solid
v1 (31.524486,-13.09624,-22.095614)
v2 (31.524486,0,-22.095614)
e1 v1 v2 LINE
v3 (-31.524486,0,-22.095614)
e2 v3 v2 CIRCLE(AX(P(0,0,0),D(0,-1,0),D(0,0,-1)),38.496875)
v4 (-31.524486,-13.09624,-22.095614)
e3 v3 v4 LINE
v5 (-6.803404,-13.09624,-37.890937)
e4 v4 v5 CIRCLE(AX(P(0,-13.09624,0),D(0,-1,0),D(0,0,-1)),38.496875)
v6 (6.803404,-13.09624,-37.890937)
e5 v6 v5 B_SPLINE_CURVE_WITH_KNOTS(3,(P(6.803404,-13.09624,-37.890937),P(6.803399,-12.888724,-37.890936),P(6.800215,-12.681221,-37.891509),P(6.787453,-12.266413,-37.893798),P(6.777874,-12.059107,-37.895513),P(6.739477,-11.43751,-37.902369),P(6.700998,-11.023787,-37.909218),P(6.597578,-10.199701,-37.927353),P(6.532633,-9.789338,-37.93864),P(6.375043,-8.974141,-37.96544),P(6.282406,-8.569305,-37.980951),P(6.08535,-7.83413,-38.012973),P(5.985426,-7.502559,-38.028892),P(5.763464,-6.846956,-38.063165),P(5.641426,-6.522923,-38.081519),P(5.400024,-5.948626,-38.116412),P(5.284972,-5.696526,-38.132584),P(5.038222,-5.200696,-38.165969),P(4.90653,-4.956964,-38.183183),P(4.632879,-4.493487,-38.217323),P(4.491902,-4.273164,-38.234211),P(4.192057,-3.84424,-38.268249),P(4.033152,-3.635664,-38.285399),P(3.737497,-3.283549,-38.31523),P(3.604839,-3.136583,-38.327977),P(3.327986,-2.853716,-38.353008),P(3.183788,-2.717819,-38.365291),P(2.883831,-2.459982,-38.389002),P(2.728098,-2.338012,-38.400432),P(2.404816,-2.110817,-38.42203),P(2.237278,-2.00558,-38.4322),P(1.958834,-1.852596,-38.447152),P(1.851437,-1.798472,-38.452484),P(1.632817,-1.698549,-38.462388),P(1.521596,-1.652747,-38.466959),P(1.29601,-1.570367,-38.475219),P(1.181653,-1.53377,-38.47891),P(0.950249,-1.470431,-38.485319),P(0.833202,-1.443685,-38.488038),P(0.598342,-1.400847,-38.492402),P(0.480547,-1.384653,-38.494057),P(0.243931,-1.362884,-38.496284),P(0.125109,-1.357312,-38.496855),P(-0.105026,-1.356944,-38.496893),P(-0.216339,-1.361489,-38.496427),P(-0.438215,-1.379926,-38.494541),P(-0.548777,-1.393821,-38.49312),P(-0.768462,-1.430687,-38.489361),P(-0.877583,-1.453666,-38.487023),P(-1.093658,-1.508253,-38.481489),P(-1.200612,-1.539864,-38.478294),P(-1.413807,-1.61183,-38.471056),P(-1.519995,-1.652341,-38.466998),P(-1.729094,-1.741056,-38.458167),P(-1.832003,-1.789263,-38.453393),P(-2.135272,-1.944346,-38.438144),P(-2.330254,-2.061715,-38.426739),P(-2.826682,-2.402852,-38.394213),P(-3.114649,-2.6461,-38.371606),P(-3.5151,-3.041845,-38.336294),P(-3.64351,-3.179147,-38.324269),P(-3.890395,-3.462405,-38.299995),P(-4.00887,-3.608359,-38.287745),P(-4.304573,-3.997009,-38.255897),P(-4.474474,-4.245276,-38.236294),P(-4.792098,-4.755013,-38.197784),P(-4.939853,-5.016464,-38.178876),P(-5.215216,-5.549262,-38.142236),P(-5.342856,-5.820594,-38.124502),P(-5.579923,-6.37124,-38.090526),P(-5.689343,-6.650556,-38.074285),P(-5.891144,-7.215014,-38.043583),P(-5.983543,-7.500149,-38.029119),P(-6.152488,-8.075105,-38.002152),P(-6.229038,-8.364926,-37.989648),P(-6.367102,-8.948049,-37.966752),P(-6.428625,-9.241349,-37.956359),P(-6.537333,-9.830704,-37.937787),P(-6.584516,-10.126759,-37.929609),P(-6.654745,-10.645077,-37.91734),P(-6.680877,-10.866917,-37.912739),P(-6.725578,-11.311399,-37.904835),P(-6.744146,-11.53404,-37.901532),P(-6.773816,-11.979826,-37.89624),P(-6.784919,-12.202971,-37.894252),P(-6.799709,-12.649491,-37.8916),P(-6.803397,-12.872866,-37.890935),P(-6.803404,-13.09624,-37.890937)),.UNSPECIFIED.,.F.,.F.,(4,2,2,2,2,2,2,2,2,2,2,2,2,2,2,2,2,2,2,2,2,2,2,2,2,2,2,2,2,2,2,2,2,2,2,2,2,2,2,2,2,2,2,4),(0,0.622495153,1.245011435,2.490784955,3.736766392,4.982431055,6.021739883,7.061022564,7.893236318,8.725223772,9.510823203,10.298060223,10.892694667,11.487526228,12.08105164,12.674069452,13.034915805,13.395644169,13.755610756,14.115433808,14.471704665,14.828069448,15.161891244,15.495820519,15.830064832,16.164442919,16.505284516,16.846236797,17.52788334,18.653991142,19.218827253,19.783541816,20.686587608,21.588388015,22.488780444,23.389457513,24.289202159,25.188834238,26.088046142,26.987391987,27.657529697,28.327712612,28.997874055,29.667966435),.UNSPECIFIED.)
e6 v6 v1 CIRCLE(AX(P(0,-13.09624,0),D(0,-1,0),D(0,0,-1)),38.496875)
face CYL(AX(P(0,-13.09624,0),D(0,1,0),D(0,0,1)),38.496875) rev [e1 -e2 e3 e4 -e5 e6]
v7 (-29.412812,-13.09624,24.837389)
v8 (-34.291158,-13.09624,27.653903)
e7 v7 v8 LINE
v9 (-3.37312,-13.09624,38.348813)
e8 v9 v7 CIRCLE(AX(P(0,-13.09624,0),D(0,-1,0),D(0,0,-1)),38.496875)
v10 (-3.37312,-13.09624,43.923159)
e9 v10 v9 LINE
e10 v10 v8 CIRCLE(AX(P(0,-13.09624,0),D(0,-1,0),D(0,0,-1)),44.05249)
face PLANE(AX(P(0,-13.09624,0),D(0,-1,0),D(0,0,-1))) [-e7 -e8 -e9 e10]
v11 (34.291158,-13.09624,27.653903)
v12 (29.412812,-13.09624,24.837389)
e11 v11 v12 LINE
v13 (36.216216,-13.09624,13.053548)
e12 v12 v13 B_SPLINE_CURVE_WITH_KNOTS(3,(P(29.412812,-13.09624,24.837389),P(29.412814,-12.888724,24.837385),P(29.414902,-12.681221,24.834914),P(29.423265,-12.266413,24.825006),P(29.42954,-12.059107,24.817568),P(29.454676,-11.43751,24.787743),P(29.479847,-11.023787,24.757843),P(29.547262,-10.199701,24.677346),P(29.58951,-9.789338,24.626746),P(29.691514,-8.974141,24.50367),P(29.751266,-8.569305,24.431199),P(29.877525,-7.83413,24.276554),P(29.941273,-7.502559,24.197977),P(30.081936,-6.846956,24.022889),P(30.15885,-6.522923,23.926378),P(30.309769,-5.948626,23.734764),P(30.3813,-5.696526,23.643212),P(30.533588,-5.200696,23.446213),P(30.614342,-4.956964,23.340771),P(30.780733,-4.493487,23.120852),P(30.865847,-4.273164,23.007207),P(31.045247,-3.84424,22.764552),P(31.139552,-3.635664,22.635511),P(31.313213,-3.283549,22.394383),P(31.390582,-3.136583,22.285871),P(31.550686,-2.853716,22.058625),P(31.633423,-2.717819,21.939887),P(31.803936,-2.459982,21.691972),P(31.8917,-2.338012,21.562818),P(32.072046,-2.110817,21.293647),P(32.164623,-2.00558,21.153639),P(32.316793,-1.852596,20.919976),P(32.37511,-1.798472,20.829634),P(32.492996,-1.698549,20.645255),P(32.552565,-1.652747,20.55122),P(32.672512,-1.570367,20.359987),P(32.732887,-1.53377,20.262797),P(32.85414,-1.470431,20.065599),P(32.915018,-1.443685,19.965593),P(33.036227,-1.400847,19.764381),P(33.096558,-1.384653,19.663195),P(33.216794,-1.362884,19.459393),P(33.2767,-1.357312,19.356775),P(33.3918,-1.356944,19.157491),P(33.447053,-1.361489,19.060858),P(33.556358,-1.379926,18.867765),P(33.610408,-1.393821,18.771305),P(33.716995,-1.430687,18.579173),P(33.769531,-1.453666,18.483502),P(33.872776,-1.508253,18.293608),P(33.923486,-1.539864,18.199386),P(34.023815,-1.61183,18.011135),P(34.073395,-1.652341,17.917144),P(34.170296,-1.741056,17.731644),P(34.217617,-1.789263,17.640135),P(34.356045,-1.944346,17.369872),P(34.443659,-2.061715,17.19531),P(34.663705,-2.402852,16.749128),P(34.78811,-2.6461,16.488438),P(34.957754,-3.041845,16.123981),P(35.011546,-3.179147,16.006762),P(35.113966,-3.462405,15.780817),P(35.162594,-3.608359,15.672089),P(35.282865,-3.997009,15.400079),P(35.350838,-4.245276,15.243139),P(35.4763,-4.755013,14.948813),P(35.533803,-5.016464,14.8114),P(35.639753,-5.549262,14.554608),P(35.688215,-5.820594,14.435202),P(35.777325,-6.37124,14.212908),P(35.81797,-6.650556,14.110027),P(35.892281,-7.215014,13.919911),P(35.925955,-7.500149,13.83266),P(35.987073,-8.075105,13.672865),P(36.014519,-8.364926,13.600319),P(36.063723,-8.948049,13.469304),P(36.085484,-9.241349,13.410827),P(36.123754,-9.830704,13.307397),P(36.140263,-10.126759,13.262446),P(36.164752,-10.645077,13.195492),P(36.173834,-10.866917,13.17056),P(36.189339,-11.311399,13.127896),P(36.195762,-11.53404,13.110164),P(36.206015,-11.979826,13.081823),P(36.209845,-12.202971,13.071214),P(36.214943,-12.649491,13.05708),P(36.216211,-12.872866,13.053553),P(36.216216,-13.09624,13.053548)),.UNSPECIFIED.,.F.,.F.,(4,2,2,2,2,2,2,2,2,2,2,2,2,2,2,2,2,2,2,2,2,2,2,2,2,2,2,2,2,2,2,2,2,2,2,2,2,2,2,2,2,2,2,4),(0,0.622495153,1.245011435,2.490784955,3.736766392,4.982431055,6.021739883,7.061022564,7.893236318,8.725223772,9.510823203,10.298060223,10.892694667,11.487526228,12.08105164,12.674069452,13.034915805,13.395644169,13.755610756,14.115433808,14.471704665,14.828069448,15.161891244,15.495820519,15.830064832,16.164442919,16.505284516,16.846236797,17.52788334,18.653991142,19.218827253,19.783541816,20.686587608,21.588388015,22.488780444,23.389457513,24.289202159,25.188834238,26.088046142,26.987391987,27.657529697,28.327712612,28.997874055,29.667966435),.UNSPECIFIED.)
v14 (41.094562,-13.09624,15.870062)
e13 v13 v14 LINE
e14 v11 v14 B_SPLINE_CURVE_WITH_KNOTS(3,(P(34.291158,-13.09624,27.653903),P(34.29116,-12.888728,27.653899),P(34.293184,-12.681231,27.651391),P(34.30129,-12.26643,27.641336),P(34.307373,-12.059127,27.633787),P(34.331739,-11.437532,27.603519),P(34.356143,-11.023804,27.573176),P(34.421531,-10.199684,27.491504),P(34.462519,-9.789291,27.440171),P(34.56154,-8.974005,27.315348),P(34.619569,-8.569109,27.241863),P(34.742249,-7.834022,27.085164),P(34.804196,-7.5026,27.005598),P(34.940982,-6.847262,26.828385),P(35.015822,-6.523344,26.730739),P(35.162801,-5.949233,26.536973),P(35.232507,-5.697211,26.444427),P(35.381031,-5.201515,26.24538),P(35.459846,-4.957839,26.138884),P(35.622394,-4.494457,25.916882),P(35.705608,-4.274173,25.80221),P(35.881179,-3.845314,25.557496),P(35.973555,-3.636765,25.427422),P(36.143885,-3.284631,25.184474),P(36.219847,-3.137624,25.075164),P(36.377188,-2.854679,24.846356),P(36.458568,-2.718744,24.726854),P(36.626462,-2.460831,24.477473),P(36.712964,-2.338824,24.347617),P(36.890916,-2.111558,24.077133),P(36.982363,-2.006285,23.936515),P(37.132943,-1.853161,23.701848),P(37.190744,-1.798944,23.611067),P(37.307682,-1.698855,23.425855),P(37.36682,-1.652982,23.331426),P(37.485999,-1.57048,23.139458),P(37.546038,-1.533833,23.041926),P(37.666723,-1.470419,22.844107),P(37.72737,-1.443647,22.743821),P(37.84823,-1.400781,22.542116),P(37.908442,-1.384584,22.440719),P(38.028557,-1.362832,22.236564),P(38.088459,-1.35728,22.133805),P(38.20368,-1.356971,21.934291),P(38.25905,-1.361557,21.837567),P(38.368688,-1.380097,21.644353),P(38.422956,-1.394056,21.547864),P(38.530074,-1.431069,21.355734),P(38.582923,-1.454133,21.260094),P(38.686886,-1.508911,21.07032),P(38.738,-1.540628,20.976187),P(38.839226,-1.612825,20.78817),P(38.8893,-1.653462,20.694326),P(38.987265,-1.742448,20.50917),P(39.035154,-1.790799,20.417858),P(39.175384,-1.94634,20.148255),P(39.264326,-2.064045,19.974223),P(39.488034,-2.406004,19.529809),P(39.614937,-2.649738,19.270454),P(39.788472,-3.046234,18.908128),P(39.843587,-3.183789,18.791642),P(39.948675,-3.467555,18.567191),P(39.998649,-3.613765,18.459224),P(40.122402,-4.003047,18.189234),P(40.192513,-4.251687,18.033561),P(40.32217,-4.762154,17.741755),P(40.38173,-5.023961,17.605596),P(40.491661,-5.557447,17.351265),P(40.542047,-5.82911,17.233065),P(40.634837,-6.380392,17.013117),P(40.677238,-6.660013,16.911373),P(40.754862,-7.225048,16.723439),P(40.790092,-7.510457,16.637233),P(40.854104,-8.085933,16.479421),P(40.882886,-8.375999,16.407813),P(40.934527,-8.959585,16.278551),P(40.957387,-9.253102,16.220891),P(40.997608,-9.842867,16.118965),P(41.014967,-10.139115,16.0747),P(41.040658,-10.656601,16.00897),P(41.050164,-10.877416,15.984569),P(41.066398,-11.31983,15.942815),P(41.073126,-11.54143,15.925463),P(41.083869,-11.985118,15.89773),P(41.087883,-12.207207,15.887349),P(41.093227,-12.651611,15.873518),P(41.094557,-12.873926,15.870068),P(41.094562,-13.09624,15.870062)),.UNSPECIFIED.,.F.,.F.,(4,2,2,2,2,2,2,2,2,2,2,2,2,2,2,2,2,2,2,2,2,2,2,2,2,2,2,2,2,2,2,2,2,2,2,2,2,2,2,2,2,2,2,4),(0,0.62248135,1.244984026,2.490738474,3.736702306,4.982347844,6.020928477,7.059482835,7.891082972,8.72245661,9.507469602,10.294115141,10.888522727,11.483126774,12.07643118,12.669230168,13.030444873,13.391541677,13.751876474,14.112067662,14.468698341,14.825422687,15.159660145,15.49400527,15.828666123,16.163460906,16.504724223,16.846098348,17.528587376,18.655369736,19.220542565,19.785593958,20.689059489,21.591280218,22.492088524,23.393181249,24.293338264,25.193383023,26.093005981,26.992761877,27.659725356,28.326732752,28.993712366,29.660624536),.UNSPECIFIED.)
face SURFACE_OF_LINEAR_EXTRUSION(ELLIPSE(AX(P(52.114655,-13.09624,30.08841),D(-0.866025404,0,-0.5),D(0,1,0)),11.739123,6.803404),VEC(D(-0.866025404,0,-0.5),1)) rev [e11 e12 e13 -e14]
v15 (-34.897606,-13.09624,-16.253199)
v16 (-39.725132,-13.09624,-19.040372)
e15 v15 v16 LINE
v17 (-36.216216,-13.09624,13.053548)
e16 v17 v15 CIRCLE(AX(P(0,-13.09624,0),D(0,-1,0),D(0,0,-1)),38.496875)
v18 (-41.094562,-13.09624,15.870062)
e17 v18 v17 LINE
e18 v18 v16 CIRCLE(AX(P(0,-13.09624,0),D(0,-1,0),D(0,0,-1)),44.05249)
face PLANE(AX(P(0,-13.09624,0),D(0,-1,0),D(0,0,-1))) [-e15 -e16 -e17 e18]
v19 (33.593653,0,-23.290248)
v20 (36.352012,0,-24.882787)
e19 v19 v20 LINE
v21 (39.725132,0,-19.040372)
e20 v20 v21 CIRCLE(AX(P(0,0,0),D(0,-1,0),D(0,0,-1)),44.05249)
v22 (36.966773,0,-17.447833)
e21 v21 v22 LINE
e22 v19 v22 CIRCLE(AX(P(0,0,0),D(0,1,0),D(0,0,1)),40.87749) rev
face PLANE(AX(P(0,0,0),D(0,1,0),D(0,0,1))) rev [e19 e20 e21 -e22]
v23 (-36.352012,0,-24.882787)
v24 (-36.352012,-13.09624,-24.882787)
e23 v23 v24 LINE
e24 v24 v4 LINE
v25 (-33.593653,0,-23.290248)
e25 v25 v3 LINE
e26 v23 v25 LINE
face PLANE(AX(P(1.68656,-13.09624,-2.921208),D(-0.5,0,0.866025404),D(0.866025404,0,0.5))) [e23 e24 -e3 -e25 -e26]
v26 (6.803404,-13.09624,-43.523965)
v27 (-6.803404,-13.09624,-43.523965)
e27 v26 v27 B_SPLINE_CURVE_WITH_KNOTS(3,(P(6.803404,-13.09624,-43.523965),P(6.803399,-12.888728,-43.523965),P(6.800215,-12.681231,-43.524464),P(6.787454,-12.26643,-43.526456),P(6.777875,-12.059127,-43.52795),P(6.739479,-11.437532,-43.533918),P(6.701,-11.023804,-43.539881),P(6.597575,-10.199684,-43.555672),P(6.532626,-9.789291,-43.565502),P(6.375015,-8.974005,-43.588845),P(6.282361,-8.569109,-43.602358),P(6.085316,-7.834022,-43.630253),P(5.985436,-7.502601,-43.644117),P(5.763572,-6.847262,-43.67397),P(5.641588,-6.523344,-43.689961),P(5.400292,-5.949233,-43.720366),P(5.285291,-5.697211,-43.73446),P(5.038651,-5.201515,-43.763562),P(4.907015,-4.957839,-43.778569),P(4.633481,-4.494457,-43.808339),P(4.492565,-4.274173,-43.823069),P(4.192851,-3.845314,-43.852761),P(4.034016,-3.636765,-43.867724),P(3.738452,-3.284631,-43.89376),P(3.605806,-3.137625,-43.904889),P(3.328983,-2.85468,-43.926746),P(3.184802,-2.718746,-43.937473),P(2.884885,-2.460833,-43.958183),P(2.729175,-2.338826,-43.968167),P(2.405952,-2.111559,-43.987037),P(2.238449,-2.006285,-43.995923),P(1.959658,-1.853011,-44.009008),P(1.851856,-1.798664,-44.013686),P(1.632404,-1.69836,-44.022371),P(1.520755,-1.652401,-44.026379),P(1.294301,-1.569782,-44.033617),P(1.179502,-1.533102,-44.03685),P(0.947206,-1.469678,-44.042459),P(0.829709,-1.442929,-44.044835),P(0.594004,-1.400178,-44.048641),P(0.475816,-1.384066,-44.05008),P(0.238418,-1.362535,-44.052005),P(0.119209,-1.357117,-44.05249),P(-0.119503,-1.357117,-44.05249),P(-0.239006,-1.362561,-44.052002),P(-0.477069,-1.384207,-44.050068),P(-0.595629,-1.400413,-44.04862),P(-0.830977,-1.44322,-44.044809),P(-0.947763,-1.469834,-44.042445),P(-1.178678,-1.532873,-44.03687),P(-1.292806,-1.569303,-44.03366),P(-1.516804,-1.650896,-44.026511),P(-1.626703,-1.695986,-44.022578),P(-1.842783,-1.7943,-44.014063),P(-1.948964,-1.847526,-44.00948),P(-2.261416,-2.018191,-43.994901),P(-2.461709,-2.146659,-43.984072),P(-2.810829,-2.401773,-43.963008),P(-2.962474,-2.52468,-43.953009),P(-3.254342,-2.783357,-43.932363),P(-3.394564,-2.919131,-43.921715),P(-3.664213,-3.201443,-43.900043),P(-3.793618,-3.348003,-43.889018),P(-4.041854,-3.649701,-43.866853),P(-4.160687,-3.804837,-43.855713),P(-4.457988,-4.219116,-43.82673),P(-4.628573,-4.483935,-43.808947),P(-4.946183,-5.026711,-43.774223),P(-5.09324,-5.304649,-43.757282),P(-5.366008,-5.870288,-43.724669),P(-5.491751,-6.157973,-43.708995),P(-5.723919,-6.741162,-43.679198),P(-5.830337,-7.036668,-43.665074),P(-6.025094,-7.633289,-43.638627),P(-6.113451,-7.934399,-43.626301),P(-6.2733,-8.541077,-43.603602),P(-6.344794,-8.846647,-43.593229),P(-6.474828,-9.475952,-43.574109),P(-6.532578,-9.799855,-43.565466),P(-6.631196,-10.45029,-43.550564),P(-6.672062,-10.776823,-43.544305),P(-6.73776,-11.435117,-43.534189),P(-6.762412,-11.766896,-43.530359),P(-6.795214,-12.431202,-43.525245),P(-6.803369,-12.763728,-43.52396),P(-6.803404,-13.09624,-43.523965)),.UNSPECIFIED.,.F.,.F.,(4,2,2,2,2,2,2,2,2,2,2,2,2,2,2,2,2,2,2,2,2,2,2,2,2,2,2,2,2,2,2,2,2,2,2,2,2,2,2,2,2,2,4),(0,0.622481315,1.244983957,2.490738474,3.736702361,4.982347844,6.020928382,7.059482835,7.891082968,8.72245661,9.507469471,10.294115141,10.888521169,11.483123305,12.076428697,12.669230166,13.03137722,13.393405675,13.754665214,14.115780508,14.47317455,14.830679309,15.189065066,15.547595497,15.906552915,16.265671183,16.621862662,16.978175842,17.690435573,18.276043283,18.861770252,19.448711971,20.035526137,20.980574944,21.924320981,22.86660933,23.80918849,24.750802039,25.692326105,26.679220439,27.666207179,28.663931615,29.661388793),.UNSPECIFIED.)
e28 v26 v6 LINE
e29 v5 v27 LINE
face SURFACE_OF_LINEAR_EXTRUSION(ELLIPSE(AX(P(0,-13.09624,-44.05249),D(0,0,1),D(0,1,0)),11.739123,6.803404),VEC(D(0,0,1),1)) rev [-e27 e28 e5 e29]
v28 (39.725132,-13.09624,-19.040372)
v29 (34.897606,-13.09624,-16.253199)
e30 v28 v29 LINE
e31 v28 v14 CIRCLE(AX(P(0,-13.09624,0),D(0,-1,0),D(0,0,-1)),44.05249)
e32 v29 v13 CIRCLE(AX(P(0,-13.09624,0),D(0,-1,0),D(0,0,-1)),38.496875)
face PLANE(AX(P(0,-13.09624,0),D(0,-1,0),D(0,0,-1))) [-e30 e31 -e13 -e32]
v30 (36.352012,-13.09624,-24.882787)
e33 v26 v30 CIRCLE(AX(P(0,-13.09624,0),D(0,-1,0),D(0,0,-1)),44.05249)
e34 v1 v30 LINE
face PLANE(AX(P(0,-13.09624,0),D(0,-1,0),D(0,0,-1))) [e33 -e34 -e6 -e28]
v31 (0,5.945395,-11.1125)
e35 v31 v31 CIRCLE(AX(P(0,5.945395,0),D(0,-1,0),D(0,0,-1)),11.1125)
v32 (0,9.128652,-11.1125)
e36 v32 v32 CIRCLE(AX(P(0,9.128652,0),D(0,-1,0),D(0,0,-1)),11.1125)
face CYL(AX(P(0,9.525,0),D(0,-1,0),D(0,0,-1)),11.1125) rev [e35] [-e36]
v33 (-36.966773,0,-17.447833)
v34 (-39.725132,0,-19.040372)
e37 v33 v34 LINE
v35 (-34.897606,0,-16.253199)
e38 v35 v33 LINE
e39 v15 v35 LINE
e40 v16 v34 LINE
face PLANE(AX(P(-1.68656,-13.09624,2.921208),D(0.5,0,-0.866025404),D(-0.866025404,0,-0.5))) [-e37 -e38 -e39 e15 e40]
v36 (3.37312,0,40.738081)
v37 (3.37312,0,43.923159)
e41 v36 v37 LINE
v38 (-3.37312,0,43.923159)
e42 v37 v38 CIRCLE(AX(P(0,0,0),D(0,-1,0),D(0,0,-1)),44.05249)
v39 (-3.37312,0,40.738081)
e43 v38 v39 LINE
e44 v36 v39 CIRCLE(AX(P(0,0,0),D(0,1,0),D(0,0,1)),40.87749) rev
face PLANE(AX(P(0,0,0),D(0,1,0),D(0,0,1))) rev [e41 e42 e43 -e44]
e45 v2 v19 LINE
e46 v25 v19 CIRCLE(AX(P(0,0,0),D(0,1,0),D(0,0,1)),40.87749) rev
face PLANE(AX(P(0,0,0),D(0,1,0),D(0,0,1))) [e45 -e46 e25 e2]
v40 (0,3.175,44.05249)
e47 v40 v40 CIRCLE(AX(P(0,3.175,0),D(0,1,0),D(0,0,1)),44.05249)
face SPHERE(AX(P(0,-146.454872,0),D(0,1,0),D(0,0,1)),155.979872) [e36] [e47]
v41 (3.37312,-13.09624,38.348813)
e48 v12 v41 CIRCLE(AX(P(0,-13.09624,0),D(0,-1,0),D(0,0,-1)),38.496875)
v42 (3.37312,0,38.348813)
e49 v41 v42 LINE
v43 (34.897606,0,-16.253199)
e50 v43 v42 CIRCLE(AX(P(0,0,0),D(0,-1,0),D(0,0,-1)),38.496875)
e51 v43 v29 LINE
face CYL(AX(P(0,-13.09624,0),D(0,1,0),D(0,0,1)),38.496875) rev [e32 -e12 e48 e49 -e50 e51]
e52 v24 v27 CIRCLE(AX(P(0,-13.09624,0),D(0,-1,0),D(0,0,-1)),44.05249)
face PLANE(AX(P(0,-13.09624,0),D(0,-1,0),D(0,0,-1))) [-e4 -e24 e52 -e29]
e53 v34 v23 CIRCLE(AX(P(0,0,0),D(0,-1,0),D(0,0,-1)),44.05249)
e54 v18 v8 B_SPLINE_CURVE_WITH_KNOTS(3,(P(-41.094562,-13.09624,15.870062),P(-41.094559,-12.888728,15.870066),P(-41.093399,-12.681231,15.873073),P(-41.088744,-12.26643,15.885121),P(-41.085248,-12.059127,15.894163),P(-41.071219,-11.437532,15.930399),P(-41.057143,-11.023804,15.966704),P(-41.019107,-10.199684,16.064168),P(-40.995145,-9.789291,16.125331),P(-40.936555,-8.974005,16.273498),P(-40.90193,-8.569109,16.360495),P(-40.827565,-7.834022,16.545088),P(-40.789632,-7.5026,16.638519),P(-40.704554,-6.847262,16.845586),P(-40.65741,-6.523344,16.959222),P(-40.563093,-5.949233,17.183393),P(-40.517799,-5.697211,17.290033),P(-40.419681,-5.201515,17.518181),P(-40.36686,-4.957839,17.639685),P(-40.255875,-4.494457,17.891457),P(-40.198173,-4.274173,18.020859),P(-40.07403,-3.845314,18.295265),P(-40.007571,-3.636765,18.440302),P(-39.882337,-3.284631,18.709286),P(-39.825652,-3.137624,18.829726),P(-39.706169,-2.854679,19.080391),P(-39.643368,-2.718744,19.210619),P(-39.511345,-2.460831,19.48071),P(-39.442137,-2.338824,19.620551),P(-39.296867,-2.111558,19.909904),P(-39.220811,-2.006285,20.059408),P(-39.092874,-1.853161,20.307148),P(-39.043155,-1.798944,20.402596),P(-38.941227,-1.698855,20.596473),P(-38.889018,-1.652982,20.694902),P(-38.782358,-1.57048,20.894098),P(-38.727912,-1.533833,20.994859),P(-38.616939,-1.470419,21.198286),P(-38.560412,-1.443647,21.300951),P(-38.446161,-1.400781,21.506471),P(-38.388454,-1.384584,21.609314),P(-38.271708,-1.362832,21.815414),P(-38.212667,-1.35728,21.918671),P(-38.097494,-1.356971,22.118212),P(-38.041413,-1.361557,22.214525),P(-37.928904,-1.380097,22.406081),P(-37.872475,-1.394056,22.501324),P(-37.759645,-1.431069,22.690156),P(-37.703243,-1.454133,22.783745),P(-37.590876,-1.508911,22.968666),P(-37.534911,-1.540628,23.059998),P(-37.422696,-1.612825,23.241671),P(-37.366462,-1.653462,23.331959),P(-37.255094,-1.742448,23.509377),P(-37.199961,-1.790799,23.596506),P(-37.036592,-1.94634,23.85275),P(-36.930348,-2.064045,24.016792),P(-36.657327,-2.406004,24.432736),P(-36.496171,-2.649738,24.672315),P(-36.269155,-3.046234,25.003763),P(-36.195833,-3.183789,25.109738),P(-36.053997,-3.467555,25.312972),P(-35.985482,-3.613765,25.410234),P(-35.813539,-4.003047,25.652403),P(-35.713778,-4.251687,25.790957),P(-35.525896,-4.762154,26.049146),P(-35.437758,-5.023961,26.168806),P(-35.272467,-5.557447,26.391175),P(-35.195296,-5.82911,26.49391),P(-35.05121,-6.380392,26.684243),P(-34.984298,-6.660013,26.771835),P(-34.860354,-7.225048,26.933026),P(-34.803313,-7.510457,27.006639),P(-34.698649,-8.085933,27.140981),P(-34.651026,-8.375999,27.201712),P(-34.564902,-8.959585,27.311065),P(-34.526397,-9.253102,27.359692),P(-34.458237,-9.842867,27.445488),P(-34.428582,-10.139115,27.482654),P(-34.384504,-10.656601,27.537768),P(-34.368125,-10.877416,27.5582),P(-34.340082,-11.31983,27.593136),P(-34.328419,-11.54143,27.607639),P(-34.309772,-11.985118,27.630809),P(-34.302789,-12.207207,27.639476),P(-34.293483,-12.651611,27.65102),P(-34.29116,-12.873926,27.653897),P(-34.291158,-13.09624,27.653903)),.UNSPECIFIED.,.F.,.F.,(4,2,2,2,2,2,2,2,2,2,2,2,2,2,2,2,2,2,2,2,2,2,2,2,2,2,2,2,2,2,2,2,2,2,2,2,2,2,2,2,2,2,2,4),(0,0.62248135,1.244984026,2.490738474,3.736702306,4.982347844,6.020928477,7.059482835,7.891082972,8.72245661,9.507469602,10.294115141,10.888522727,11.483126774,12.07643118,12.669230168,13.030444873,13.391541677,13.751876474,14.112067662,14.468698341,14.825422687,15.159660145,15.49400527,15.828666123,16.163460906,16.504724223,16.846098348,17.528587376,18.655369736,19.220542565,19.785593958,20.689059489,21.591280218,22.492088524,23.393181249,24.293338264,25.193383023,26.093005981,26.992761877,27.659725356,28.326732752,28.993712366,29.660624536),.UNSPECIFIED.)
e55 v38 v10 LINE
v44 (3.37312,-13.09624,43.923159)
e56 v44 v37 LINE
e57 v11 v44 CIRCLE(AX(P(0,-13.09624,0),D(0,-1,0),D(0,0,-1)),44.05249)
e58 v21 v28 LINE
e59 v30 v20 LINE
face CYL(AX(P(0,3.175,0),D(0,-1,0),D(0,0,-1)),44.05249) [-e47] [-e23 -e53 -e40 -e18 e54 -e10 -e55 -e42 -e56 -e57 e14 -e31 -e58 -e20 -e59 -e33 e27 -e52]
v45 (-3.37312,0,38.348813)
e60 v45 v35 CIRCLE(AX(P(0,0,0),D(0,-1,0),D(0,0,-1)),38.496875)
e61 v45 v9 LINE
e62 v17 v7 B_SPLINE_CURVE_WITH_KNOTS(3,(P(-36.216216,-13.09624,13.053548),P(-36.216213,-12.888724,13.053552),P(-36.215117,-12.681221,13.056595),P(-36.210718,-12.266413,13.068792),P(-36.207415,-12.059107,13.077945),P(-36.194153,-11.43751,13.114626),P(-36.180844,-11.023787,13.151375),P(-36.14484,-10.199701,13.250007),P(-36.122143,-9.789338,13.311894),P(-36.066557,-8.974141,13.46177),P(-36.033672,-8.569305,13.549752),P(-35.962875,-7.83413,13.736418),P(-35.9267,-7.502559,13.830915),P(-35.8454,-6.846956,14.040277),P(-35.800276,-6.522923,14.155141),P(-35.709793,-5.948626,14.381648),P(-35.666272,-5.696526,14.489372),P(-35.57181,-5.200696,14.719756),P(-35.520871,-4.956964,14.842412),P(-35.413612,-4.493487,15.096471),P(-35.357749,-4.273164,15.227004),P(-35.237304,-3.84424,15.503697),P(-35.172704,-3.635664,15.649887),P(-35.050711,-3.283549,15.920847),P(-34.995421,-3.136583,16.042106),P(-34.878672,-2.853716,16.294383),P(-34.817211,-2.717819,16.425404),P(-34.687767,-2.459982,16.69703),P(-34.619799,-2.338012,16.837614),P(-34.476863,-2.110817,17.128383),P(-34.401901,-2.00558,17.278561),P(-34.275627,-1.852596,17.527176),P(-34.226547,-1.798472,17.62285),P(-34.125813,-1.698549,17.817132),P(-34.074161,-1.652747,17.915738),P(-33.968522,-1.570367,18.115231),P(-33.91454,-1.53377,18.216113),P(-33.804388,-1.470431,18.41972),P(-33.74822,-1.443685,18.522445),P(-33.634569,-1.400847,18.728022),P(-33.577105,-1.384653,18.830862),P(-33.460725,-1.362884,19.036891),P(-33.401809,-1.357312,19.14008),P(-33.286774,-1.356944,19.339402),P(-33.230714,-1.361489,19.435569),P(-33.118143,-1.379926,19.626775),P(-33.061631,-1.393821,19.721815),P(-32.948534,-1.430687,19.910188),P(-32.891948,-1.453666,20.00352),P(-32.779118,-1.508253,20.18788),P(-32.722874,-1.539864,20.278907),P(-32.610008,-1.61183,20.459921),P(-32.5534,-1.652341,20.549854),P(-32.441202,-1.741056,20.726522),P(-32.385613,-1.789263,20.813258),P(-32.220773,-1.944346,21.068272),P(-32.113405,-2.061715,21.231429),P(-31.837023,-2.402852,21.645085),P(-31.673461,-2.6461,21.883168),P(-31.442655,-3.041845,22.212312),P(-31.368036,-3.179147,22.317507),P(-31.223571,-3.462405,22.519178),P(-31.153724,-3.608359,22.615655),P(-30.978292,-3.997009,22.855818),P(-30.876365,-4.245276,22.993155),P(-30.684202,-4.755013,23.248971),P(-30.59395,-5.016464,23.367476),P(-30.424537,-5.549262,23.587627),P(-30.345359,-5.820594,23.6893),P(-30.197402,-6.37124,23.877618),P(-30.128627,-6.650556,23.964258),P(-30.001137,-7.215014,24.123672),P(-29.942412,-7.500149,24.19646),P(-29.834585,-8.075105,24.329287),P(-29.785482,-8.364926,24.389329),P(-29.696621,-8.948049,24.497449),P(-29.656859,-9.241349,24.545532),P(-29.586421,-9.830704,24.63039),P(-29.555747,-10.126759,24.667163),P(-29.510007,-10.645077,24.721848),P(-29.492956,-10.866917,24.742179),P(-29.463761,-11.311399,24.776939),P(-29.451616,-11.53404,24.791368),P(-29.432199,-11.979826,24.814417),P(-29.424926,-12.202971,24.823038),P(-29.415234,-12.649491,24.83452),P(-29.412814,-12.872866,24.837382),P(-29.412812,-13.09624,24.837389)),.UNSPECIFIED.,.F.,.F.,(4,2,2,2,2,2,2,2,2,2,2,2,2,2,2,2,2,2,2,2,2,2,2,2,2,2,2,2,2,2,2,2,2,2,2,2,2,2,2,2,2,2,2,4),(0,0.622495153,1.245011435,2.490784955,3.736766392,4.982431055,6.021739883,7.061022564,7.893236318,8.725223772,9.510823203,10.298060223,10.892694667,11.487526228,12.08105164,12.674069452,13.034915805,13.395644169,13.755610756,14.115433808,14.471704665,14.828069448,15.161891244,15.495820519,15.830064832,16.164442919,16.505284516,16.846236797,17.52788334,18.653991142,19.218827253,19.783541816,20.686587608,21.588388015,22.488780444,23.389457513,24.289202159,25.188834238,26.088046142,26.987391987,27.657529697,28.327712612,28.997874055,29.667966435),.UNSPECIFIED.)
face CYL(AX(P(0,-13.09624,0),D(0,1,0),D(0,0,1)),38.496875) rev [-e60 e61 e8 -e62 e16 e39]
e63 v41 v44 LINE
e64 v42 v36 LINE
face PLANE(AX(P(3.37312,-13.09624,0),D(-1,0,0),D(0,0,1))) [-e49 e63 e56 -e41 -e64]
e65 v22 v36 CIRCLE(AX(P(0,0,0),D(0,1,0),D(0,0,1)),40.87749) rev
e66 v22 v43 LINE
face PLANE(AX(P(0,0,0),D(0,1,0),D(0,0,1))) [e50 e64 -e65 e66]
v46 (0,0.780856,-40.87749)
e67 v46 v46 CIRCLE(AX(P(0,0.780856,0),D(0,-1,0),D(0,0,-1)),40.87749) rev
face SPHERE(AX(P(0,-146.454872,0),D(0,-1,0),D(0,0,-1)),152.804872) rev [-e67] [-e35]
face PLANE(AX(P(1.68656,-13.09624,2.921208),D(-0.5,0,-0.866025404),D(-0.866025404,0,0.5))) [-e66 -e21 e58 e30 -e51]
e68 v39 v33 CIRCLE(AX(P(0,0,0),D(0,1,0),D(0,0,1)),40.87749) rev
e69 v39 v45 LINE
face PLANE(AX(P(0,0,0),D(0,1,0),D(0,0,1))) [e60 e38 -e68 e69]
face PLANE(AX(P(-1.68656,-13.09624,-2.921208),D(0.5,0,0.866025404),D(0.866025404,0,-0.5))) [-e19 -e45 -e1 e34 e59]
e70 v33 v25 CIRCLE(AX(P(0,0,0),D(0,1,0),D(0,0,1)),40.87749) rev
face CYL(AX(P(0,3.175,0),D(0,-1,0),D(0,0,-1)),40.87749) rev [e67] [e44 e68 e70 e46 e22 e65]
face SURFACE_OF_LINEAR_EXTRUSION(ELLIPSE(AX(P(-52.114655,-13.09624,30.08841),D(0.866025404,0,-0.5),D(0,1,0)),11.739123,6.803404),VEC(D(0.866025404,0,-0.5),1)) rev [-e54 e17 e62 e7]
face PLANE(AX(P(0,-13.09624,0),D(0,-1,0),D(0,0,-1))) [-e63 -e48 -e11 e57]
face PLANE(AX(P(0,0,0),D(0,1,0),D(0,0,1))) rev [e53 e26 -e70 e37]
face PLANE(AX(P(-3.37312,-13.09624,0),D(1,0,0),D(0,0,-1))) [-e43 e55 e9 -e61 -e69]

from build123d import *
from build123d.topology import SkipClean

# Parameters (mm, degrees)
SKETCH2_R           = 44.05249
BOSS_EXTRUDE1_DEPTH = 3.175
SKETCH4_R           = 44.45
SKETCH4_R_2         = 38.496875
BOSS_EXTRUDE2_DEPTH = 13.09624
SKETCH5_W           = 6.74624
SKETCH5_H           = 50.081304553
CUT_EXTRUDE1_DEPTH  = 65.211498208
CIRPATTERN1_COUNT   = 3
DOME1_FACE_RADIUS   = 44.05249
DOME1_HEIGHT        = 6.35
SKETCH11_R          = 11.1125
CUT_EXTRUDE4_DEPTH  = 65.211498208
SKETCH12_R          = 44.45
SKETCH12_R_2        = 44.05249
CUT_EXTRUDE5_DEPTH  = 67.674963897
SKETCH13_RX         = 11.739123023
SKETCH13_RY         = 6.803403928
CUT_EXTRUDE6_DEPTH  = 64.661253935
CIRPATTERN2_COUNT   = 3


# Read off the part's stored shape, not the designer's step: Shell2
with BuildPart() as part:
    # Sketch2 → Boss-Extrude1 (new body)
    with BuildSketch(Plane(origin=(0, 0, 0), x_dir=(1, 0, 0), z_dir=(0, 1, 0))):
        with Locations(Location((0, 0, 0), (0, 0, 270))):
            Circle(SKETCH2_R)
    extrude(amount=BOSS_EXTRUDE1_DEPTH)

    # Sketch4 → Boss-Extrude2 (add)
    with BuildSketch(Plane.XZ):
        with Locations(Location((0, 0, 0), (0, 0, 270))):
            Circle(SKETCH4_R)
        with Locations(Location((0, 0, 0), (0, 0, 270))):
            Circle(SKETCH4_R_2, mode=Mode.SUBTRACT)
    extrude(amount=BOSS_EXTRUDE2_DEPTH)

    # Sketch5 → Cut-Extrude1 (cut, through all)
    with BuildSketch(Plane.XZ):
        with Locations((0, 25.040652277)):
            Rectangle(SKETCH5_W, SKETCH5_H)
    cut_extrude1 = extrude(amount=CUT_EXTRUDE1_DEPTH, mode=Mode.SUBTRACT)

    # CirPattern1: Cut-Extrude1 ×3 about axis
    cirpattern1_axis = Axis((0, 0, 0), (0, 1, 0))
    for i in range(1, CIRPATTERN1_COUNT):
        add(cut_extrude1.rotate(cirpattern1_axis, i * 360 / CIRPATTERN1_COUNT), mode=Mode.SUBTRACT)

    # Dome1: a dome of height H over a round flat face of radius A is a cap of a sphere of radius (A * A + H * H) / (2 * H)
    dome1_r = (DOME1_FACE_RADIUS * DOME1_FACE_RADIUS + DOME1_HEIGHT * DOME1_HEIGHT) / (2 * DOME1_HEIGHT)
    dome1_base = Plane((0, 3.175, 0), z_dir=(0, 1, 0))
    with Locations(dome1_base.offset(DOME1_HEIGHT - dome1_r)):
        dome1_ball = Sphere(dome1_r, mode=Mode.PRIVATE)
    add(split(dome1_ball, bisect_by=dome1_base, keep=Keep.TOP, mode=Mode.PRIVATE))

    # Shell2 outline → Shell2 (revolve, cut)
    with BuildSketch(Plane.XY):
        with BuildLine():
            Line((0, 0), (40.87749, 0))
            Line((40.87749, 0), (40.877490147, 0.780856364))
            ThreePointArc((40.877490147, 0.780856364), (20.62755779, 4.951312704), (0, 6.35))
            Line((0, 6.35), (0, 0))
        make_face()
    revolve(axis=Axis((0, 0, 0), (0, 1, 0)), mode=Mode.SUBTRACT)

    # Sketch11 → Cut-Extrude4 (cut, through all)
    with BuildSketch(Plane(origin=(0, 0, 0), x_dir=(1, 0, 0), z_dir=(0, 1, 0))):
        with Locations(Location((0, 0, 0), (0, 0, 90))):
            Circle(SKETCH11_R)
    extrude(amount=CUT_EXTRUDE4_DEPTH, mode=Mode.SUBTRACT)

    # Sketch12 → Cut-Extrude5 (cut, through all)
    with SkipClean():  # the faces are left unmerged after this step: merging them gives an invalid solid
        with BuildSketch(Plane.XZ.offset(13.09624)):
            Circle(SKETCH12_R)
            with Locations(Location((0, 0, 0), (0, 0, 325.608536688))):
                Circle(SKETCH12_R_2, mode=Mode.SUBTRACT)
        extrude(amount=-CUT_EXTRUDE5_DEPTH, mode=Mode.SUBTRACT)

    # Sketch13 → Cut-Extrude6 (cut, through all)
    with SkipClean():  # the faces are left unmerged after this step: merging them gives an invalid solid
        with BuildSketch(Plane.XY):
            with Locations(Location((0, -13.09624), (0, 0, 90))):
                Ellipse(SKETCH13_RX, SKETCH13_RY)
        cut_extrude6 = extrude(amount=-CUT_EXTRUDE6_DEPTH, mode=Mode.SUBTRACT)

    # CirPattern2: Cut-Extrude6 ×3 about axis
    with SkipClean():  # the faces are left unmerged after this step: merging them gives an invalid solid
        cirpattern2_axis = Axis((0, 3.175, 0), (0, -1, 0))
        for i in range(1, CIRPATTERN2_COUNT):
            add(cut_extrude6.rotate(cirpattern2_axis, i * 360 / CIRPATTERN2_COUNT), mode=Mode.SUBTRACT)


solid = part.part
